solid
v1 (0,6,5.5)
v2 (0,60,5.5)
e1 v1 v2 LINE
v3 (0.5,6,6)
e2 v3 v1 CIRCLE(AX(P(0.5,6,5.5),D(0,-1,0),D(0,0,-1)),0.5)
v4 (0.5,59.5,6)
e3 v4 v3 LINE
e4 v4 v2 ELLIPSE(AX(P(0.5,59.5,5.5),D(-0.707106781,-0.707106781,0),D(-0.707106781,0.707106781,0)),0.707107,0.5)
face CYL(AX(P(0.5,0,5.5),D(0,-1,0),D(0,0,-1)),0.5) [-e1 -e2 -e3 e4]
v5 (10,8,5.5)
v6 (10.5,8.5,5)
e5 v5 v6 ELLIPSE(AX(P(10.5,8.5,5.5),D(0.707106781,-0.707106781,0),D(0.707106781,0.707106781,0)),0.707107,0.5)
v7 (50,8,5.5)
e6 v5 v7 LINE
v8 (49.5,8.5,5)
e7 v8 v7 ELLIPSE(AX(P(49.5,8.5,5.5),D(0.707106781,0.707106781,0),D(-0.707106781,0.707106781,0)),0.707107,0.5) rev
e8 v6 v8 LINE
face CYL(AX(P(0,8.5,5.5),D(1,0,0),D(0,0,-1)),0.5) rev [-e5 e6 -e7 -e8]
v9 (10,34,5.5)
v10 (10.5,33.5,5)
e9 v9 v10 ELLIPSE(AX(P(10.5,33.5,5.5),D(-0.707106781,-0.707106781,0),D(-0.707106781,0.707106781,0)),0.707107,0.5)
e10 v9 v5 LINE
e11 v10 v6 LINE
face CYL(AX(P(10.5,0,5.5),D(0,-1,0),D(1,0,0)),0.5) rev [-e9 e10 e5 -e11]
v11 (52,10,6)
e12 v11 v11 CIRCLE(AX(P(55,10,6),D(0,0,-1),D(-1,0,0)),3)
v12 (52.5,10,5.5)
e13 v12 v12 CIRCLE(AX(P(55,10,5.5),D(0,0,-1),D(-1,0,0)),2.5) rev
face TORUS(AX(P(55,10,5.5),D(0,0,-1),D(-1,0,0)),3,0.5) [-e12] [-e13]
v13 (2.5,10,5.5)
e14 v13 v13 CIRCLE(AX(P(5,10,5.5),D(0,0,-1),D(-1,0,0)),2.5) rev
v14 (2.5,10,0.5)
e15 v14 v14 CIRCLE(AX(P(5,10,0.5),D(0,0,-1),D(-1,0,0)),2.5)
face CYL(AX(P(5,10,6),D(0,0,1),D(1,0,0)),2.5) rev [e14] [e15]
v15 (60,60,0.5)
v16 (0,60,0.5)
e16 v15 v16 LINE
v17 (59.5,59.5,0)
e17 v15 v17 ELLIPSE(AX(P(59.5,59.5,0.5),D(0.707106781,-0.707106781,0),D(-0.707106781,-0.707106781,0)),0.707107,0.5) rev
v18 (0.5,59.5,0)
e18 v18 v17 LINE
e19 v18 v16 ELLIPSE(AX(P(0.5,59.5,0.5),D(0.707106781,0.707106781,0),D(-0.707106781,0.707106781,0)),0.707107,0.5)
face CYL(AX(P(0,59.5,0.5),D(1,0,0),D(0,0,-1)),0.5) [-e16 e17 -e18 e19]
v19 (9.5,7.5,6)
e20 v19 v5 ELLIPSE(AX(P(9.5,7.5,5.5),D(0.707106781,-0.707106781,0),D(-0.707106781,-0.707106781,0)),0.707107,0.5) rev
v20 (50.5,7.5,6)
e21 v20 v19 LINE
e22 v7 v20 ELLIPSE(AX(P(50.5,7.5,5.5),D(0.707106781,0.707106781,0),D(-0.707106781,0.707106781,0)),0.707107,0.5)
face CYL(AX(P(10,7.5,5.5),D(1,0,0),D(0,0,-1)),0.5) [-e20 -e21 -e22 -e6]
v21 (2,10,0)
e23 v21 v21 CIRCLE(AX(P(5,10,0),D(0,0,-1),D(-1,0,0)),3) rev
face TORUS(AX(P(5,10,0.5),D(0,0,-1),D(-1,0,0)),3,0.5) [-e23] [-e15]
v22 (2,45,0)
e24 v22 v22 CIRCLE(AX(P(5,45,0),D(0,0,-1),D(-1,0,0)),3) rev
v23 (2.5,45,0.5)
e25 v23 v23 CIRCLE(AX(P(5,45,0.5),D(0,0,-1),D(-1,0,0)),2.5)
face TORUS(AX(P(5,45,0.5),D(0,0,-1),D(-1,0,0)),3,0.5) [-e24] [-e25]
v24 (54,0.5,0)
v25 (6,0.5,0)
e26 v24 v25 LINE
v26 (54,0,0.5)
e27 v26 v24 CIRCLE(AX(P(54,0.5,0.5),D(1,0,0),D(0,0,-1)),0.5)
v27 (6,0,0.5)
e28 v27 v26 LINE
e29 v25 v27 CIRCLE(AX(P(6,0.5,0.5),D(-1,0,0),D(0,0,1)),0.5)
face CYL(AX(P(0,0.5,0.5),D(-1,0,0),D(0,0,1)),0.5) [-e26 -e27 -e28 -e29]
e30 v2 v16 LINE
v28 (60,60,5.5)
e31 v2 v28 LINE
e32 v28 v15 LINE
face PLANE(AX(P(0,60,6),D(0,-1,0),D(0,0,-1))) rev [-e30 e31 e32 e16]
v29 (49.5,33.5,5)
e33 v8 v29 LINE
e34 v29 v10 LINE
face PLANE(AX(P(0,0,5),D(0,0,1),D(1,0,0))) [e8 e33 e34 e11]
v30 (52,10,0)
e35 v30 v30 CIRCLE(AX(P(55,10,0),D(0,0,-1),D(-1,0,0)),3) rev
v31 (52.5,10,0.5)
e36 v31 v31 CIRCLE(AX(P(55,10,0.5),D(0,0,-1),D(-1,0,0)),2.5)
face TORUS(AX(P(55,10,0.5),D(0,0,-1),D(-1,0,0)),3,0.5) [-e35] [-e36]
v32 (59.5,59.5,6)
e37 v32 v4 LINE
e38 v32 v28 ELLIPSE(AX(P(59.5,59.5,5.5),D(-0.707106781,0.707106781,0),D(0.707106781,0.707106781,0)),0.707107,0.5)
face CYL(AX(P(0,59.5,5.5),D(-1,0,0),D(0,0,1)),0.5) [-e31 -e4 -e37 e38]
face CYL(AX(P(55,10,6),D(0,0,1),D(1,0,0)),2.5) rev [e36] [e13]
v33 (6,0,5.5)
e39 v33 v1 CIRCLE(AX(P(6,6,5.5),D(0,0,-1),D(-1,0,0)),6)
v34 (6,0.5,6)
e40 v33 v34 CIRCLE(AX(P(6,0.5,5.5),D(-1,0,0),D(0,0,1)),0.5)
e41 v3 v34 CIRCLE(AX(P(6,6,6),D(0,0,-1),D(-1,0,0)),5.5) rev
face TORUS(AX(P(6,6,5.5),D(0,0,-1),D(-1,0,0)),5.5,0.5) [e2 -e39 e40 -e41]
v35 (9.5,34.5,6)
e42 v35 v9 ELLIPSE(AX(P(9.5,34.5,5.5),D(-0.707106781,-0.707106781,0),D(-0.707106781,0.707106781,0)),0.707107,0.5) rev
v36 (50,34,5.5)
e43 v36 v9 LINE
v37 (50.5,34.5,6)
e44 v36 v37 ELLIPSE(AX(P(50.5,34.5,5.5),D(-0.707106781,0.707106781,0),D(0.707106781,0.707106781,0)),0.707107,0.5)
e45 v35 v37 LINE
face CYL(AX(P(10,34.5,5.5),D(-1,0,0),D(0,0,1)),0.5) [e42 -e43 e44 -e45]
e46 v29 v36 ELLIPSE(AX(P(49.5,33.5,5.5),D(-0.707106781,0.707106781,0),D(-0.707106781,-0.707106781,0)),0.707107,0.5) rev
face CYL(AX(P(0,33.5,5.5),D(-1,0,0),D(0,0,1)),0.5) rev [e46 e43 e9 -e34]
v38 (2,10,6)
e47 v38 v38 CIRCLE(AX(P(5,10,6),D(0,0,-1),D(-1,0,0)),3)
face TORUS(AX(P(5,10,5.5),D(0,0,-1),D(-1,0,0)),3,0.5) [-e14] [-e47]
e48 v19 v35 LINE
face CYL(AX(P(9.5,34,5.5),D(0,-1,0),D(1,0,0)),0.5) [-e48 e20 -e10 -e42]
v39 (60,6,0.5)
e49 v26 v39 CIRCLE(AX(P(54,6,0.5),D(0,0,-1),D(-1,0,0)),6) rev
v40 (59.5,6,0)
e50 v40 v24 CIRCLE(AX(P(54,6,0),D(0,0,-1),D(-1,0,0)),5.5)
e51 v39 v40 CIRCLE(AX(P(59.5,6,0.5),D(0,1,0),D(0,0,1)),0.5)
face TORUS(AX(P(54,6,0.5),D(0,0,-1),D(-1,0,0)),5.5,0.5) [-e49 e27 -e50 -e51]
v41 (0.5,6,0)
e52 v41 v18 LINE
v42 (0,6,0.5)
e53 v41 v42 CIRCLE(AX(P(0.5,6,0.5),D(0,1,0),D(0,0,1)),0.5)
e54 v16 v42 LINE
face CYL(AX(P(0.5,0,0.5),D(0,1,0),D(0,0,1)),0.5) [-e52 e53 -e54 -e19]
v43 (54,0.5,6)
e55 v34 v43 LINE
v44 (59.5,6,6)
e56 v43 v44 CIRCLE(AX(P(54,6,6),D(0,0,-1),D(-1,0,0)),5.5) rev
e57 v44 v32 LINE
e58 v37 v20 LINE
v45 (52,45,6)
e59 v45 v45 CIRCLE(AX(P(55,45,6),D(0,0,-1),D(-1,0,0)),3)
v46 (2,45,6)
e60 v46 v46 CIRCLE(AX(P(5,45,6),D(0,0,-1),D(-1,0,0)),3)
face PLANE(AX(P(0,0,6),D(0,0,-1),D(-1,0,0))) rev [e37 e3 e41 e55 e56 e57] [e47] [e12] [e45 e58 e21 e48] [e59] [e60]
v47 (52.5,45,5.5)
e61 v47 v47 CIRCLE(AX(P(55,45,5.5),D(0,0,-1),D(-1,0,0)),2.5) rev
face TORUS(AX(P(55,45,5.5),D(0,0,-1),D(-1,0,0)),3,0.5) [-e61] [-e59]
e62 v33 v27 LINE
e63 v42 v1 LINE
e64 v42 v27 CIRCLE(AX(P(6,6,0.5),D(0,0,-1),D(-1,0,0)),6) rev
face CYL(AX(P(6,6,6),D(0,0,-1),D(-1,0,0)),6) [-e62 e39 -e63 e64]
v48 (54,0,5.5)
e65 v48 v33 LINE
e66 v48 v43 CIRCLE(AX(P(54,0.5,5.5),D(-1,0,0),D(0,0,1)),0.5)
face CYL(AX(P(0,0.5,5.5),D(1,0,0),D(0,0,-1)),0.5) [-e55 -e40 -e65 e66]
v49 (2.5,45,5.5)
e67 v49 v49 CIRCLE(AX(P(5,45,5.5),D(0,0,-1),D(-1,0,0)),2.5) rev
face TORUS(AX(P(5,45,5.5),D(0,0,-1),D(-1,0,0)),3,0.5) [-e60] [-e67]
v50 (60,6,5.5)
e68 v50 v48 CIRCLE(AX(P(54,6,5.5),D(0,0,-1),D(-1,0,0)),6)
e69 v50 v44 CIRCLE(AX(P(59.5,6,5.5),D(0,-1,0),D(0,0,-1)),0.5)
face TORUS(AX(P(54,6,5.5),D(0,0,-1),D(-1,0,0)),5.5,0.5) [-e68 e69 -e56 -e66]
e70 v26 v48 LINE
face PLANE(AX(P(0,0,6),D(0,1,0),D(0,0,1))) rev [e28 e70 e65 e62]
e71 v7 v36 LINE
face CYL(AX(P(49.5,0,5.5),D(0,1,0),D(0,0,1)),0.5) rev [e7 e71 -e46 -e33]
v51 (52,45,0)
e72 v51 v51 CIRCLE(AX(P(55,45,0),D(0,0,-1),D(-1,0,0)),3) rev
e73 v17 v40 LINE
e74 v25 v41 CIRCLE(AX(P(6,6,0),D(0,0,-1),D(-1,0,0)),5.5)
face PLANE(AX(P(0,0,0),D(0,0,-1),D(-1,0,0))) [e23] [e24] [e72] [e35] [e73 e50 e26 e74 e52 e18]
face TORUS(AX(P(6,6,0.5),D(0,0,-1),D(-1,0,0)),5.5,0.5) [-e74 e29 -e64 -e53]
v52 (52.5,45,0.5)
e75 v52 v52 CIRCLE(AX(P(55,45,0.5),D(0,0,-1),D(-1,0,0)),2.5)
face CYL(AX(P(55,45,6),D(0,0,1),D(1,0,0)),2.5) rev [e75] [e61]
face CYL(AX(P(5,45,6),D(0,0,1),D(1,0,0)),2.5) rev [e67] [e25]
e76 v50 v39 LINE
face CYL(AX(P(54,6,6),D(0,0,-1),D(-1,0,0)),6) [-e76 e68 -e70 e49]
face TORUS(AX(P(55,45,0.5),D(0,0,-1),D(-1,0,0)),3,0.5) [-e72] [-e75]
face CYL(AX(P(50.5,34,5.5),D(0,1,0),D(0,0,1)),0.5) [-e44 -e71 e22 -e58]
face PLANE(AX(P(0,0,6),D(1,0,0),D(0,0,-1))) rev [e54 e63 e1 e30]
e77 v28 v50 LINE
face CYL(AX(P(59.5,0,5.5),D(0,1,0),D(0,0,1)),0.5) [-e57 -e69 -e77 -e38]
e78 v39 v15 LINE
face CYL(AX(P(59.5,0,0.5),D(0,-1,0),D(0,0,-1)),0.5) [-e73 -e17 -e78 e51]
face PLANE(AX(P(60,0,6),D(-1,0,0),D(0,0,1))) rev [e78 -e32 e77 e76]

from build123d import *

# Parameters (mm, degrees)
SKETCH1_W             = 60
SKETCH1_H             = 60
BOSS_EXTRUDE1_DEPTH   = 6
F_5_0MM_DOWEL_HOLE1_D = 5
FILLET1_R             = 6
SKETCH2_W             = 40
SKETCH2_H             = 26
CUT_EXTRUDE1_DEPTH    = 1
FILLET2_R             = 0.5


with BuildPart() as part:
    # Sketch1 → Boss-Extrude1 (new body)
    with BuildSketch(Plane.XY):
        with Locations((30, 30)):
            Rectangle(SKETCH1_W, SKETCH1_H)
    extrude(amount=BOSS_EXTRUDE1_DEPTH)

    # Ø5.0mm Dowel Hole1 (through all)
    with Locations(Plane.XY.offset(6)):
        with Locations((5, 10), (55, 10), (55, 45), (5, 45)):
            Hole(F_5_0MM_DOWEL_HOLE1_D / 2)

    # Fillet1
    fillet1_edges = [part.edges().sort_by_distance(p)[0] for p in [
        (60, 0, 3),
        (0, 0, 3),
    ]]
    fillet(fillet1_edges, radius=FILLET1_R)

    # Sketch2 → Cut-Extrude1 (cut)
    with BuildSketch(Plane.XY.offset(6)):
        with Locations((30, 21)):
            Rectangle(SKETCH2_W, SKETCH2_H)
    extrude(amount=-CUT_EXTRUDE1_DEPTH, mode=Mode.SUBTRACT)

    # Fillet2
    fillet2_edges = [part.edges().sort_by_distance(p)[0] for p in [
        (30, 60, 0),
        (0, 33, 0),
        (1.757359313, 1.757359313, 0),
        (30, 0, 0),
        (58.242640687, 1.757359313, 0),
        (60, 33, 0),
        (7.5, 45, 0),
        (57.5, 45, 0),
        (57.5, 10, 0),
        (7.5, 10, 0),
        (1.757359313, 1.757359313, 6),
        (0, 33, 6),
        (30, 60, 6),
        (60, 33, 6),
        (58.242640687, 1.757359313, 6),
        (30, 0, 6),
        (7.5, 45, 6),
        (57.5, 45, 6),
        (57.5, 10, 6),
        (7.5, 10, 6),
        (50, 21, 6),
        (30, 34, 6),
        (10, 21, 6),
        (30, 8, 6),
        (30, 34, 5),
        (50, 21, 5),
        (30, 8, 5),
        (10, 21, 5),
    ]]
    fillet(fillet2_edges, radius=FILLET2_R - 0.0001)  # a hair under: the kernel refuses the full size


solid = part.part
